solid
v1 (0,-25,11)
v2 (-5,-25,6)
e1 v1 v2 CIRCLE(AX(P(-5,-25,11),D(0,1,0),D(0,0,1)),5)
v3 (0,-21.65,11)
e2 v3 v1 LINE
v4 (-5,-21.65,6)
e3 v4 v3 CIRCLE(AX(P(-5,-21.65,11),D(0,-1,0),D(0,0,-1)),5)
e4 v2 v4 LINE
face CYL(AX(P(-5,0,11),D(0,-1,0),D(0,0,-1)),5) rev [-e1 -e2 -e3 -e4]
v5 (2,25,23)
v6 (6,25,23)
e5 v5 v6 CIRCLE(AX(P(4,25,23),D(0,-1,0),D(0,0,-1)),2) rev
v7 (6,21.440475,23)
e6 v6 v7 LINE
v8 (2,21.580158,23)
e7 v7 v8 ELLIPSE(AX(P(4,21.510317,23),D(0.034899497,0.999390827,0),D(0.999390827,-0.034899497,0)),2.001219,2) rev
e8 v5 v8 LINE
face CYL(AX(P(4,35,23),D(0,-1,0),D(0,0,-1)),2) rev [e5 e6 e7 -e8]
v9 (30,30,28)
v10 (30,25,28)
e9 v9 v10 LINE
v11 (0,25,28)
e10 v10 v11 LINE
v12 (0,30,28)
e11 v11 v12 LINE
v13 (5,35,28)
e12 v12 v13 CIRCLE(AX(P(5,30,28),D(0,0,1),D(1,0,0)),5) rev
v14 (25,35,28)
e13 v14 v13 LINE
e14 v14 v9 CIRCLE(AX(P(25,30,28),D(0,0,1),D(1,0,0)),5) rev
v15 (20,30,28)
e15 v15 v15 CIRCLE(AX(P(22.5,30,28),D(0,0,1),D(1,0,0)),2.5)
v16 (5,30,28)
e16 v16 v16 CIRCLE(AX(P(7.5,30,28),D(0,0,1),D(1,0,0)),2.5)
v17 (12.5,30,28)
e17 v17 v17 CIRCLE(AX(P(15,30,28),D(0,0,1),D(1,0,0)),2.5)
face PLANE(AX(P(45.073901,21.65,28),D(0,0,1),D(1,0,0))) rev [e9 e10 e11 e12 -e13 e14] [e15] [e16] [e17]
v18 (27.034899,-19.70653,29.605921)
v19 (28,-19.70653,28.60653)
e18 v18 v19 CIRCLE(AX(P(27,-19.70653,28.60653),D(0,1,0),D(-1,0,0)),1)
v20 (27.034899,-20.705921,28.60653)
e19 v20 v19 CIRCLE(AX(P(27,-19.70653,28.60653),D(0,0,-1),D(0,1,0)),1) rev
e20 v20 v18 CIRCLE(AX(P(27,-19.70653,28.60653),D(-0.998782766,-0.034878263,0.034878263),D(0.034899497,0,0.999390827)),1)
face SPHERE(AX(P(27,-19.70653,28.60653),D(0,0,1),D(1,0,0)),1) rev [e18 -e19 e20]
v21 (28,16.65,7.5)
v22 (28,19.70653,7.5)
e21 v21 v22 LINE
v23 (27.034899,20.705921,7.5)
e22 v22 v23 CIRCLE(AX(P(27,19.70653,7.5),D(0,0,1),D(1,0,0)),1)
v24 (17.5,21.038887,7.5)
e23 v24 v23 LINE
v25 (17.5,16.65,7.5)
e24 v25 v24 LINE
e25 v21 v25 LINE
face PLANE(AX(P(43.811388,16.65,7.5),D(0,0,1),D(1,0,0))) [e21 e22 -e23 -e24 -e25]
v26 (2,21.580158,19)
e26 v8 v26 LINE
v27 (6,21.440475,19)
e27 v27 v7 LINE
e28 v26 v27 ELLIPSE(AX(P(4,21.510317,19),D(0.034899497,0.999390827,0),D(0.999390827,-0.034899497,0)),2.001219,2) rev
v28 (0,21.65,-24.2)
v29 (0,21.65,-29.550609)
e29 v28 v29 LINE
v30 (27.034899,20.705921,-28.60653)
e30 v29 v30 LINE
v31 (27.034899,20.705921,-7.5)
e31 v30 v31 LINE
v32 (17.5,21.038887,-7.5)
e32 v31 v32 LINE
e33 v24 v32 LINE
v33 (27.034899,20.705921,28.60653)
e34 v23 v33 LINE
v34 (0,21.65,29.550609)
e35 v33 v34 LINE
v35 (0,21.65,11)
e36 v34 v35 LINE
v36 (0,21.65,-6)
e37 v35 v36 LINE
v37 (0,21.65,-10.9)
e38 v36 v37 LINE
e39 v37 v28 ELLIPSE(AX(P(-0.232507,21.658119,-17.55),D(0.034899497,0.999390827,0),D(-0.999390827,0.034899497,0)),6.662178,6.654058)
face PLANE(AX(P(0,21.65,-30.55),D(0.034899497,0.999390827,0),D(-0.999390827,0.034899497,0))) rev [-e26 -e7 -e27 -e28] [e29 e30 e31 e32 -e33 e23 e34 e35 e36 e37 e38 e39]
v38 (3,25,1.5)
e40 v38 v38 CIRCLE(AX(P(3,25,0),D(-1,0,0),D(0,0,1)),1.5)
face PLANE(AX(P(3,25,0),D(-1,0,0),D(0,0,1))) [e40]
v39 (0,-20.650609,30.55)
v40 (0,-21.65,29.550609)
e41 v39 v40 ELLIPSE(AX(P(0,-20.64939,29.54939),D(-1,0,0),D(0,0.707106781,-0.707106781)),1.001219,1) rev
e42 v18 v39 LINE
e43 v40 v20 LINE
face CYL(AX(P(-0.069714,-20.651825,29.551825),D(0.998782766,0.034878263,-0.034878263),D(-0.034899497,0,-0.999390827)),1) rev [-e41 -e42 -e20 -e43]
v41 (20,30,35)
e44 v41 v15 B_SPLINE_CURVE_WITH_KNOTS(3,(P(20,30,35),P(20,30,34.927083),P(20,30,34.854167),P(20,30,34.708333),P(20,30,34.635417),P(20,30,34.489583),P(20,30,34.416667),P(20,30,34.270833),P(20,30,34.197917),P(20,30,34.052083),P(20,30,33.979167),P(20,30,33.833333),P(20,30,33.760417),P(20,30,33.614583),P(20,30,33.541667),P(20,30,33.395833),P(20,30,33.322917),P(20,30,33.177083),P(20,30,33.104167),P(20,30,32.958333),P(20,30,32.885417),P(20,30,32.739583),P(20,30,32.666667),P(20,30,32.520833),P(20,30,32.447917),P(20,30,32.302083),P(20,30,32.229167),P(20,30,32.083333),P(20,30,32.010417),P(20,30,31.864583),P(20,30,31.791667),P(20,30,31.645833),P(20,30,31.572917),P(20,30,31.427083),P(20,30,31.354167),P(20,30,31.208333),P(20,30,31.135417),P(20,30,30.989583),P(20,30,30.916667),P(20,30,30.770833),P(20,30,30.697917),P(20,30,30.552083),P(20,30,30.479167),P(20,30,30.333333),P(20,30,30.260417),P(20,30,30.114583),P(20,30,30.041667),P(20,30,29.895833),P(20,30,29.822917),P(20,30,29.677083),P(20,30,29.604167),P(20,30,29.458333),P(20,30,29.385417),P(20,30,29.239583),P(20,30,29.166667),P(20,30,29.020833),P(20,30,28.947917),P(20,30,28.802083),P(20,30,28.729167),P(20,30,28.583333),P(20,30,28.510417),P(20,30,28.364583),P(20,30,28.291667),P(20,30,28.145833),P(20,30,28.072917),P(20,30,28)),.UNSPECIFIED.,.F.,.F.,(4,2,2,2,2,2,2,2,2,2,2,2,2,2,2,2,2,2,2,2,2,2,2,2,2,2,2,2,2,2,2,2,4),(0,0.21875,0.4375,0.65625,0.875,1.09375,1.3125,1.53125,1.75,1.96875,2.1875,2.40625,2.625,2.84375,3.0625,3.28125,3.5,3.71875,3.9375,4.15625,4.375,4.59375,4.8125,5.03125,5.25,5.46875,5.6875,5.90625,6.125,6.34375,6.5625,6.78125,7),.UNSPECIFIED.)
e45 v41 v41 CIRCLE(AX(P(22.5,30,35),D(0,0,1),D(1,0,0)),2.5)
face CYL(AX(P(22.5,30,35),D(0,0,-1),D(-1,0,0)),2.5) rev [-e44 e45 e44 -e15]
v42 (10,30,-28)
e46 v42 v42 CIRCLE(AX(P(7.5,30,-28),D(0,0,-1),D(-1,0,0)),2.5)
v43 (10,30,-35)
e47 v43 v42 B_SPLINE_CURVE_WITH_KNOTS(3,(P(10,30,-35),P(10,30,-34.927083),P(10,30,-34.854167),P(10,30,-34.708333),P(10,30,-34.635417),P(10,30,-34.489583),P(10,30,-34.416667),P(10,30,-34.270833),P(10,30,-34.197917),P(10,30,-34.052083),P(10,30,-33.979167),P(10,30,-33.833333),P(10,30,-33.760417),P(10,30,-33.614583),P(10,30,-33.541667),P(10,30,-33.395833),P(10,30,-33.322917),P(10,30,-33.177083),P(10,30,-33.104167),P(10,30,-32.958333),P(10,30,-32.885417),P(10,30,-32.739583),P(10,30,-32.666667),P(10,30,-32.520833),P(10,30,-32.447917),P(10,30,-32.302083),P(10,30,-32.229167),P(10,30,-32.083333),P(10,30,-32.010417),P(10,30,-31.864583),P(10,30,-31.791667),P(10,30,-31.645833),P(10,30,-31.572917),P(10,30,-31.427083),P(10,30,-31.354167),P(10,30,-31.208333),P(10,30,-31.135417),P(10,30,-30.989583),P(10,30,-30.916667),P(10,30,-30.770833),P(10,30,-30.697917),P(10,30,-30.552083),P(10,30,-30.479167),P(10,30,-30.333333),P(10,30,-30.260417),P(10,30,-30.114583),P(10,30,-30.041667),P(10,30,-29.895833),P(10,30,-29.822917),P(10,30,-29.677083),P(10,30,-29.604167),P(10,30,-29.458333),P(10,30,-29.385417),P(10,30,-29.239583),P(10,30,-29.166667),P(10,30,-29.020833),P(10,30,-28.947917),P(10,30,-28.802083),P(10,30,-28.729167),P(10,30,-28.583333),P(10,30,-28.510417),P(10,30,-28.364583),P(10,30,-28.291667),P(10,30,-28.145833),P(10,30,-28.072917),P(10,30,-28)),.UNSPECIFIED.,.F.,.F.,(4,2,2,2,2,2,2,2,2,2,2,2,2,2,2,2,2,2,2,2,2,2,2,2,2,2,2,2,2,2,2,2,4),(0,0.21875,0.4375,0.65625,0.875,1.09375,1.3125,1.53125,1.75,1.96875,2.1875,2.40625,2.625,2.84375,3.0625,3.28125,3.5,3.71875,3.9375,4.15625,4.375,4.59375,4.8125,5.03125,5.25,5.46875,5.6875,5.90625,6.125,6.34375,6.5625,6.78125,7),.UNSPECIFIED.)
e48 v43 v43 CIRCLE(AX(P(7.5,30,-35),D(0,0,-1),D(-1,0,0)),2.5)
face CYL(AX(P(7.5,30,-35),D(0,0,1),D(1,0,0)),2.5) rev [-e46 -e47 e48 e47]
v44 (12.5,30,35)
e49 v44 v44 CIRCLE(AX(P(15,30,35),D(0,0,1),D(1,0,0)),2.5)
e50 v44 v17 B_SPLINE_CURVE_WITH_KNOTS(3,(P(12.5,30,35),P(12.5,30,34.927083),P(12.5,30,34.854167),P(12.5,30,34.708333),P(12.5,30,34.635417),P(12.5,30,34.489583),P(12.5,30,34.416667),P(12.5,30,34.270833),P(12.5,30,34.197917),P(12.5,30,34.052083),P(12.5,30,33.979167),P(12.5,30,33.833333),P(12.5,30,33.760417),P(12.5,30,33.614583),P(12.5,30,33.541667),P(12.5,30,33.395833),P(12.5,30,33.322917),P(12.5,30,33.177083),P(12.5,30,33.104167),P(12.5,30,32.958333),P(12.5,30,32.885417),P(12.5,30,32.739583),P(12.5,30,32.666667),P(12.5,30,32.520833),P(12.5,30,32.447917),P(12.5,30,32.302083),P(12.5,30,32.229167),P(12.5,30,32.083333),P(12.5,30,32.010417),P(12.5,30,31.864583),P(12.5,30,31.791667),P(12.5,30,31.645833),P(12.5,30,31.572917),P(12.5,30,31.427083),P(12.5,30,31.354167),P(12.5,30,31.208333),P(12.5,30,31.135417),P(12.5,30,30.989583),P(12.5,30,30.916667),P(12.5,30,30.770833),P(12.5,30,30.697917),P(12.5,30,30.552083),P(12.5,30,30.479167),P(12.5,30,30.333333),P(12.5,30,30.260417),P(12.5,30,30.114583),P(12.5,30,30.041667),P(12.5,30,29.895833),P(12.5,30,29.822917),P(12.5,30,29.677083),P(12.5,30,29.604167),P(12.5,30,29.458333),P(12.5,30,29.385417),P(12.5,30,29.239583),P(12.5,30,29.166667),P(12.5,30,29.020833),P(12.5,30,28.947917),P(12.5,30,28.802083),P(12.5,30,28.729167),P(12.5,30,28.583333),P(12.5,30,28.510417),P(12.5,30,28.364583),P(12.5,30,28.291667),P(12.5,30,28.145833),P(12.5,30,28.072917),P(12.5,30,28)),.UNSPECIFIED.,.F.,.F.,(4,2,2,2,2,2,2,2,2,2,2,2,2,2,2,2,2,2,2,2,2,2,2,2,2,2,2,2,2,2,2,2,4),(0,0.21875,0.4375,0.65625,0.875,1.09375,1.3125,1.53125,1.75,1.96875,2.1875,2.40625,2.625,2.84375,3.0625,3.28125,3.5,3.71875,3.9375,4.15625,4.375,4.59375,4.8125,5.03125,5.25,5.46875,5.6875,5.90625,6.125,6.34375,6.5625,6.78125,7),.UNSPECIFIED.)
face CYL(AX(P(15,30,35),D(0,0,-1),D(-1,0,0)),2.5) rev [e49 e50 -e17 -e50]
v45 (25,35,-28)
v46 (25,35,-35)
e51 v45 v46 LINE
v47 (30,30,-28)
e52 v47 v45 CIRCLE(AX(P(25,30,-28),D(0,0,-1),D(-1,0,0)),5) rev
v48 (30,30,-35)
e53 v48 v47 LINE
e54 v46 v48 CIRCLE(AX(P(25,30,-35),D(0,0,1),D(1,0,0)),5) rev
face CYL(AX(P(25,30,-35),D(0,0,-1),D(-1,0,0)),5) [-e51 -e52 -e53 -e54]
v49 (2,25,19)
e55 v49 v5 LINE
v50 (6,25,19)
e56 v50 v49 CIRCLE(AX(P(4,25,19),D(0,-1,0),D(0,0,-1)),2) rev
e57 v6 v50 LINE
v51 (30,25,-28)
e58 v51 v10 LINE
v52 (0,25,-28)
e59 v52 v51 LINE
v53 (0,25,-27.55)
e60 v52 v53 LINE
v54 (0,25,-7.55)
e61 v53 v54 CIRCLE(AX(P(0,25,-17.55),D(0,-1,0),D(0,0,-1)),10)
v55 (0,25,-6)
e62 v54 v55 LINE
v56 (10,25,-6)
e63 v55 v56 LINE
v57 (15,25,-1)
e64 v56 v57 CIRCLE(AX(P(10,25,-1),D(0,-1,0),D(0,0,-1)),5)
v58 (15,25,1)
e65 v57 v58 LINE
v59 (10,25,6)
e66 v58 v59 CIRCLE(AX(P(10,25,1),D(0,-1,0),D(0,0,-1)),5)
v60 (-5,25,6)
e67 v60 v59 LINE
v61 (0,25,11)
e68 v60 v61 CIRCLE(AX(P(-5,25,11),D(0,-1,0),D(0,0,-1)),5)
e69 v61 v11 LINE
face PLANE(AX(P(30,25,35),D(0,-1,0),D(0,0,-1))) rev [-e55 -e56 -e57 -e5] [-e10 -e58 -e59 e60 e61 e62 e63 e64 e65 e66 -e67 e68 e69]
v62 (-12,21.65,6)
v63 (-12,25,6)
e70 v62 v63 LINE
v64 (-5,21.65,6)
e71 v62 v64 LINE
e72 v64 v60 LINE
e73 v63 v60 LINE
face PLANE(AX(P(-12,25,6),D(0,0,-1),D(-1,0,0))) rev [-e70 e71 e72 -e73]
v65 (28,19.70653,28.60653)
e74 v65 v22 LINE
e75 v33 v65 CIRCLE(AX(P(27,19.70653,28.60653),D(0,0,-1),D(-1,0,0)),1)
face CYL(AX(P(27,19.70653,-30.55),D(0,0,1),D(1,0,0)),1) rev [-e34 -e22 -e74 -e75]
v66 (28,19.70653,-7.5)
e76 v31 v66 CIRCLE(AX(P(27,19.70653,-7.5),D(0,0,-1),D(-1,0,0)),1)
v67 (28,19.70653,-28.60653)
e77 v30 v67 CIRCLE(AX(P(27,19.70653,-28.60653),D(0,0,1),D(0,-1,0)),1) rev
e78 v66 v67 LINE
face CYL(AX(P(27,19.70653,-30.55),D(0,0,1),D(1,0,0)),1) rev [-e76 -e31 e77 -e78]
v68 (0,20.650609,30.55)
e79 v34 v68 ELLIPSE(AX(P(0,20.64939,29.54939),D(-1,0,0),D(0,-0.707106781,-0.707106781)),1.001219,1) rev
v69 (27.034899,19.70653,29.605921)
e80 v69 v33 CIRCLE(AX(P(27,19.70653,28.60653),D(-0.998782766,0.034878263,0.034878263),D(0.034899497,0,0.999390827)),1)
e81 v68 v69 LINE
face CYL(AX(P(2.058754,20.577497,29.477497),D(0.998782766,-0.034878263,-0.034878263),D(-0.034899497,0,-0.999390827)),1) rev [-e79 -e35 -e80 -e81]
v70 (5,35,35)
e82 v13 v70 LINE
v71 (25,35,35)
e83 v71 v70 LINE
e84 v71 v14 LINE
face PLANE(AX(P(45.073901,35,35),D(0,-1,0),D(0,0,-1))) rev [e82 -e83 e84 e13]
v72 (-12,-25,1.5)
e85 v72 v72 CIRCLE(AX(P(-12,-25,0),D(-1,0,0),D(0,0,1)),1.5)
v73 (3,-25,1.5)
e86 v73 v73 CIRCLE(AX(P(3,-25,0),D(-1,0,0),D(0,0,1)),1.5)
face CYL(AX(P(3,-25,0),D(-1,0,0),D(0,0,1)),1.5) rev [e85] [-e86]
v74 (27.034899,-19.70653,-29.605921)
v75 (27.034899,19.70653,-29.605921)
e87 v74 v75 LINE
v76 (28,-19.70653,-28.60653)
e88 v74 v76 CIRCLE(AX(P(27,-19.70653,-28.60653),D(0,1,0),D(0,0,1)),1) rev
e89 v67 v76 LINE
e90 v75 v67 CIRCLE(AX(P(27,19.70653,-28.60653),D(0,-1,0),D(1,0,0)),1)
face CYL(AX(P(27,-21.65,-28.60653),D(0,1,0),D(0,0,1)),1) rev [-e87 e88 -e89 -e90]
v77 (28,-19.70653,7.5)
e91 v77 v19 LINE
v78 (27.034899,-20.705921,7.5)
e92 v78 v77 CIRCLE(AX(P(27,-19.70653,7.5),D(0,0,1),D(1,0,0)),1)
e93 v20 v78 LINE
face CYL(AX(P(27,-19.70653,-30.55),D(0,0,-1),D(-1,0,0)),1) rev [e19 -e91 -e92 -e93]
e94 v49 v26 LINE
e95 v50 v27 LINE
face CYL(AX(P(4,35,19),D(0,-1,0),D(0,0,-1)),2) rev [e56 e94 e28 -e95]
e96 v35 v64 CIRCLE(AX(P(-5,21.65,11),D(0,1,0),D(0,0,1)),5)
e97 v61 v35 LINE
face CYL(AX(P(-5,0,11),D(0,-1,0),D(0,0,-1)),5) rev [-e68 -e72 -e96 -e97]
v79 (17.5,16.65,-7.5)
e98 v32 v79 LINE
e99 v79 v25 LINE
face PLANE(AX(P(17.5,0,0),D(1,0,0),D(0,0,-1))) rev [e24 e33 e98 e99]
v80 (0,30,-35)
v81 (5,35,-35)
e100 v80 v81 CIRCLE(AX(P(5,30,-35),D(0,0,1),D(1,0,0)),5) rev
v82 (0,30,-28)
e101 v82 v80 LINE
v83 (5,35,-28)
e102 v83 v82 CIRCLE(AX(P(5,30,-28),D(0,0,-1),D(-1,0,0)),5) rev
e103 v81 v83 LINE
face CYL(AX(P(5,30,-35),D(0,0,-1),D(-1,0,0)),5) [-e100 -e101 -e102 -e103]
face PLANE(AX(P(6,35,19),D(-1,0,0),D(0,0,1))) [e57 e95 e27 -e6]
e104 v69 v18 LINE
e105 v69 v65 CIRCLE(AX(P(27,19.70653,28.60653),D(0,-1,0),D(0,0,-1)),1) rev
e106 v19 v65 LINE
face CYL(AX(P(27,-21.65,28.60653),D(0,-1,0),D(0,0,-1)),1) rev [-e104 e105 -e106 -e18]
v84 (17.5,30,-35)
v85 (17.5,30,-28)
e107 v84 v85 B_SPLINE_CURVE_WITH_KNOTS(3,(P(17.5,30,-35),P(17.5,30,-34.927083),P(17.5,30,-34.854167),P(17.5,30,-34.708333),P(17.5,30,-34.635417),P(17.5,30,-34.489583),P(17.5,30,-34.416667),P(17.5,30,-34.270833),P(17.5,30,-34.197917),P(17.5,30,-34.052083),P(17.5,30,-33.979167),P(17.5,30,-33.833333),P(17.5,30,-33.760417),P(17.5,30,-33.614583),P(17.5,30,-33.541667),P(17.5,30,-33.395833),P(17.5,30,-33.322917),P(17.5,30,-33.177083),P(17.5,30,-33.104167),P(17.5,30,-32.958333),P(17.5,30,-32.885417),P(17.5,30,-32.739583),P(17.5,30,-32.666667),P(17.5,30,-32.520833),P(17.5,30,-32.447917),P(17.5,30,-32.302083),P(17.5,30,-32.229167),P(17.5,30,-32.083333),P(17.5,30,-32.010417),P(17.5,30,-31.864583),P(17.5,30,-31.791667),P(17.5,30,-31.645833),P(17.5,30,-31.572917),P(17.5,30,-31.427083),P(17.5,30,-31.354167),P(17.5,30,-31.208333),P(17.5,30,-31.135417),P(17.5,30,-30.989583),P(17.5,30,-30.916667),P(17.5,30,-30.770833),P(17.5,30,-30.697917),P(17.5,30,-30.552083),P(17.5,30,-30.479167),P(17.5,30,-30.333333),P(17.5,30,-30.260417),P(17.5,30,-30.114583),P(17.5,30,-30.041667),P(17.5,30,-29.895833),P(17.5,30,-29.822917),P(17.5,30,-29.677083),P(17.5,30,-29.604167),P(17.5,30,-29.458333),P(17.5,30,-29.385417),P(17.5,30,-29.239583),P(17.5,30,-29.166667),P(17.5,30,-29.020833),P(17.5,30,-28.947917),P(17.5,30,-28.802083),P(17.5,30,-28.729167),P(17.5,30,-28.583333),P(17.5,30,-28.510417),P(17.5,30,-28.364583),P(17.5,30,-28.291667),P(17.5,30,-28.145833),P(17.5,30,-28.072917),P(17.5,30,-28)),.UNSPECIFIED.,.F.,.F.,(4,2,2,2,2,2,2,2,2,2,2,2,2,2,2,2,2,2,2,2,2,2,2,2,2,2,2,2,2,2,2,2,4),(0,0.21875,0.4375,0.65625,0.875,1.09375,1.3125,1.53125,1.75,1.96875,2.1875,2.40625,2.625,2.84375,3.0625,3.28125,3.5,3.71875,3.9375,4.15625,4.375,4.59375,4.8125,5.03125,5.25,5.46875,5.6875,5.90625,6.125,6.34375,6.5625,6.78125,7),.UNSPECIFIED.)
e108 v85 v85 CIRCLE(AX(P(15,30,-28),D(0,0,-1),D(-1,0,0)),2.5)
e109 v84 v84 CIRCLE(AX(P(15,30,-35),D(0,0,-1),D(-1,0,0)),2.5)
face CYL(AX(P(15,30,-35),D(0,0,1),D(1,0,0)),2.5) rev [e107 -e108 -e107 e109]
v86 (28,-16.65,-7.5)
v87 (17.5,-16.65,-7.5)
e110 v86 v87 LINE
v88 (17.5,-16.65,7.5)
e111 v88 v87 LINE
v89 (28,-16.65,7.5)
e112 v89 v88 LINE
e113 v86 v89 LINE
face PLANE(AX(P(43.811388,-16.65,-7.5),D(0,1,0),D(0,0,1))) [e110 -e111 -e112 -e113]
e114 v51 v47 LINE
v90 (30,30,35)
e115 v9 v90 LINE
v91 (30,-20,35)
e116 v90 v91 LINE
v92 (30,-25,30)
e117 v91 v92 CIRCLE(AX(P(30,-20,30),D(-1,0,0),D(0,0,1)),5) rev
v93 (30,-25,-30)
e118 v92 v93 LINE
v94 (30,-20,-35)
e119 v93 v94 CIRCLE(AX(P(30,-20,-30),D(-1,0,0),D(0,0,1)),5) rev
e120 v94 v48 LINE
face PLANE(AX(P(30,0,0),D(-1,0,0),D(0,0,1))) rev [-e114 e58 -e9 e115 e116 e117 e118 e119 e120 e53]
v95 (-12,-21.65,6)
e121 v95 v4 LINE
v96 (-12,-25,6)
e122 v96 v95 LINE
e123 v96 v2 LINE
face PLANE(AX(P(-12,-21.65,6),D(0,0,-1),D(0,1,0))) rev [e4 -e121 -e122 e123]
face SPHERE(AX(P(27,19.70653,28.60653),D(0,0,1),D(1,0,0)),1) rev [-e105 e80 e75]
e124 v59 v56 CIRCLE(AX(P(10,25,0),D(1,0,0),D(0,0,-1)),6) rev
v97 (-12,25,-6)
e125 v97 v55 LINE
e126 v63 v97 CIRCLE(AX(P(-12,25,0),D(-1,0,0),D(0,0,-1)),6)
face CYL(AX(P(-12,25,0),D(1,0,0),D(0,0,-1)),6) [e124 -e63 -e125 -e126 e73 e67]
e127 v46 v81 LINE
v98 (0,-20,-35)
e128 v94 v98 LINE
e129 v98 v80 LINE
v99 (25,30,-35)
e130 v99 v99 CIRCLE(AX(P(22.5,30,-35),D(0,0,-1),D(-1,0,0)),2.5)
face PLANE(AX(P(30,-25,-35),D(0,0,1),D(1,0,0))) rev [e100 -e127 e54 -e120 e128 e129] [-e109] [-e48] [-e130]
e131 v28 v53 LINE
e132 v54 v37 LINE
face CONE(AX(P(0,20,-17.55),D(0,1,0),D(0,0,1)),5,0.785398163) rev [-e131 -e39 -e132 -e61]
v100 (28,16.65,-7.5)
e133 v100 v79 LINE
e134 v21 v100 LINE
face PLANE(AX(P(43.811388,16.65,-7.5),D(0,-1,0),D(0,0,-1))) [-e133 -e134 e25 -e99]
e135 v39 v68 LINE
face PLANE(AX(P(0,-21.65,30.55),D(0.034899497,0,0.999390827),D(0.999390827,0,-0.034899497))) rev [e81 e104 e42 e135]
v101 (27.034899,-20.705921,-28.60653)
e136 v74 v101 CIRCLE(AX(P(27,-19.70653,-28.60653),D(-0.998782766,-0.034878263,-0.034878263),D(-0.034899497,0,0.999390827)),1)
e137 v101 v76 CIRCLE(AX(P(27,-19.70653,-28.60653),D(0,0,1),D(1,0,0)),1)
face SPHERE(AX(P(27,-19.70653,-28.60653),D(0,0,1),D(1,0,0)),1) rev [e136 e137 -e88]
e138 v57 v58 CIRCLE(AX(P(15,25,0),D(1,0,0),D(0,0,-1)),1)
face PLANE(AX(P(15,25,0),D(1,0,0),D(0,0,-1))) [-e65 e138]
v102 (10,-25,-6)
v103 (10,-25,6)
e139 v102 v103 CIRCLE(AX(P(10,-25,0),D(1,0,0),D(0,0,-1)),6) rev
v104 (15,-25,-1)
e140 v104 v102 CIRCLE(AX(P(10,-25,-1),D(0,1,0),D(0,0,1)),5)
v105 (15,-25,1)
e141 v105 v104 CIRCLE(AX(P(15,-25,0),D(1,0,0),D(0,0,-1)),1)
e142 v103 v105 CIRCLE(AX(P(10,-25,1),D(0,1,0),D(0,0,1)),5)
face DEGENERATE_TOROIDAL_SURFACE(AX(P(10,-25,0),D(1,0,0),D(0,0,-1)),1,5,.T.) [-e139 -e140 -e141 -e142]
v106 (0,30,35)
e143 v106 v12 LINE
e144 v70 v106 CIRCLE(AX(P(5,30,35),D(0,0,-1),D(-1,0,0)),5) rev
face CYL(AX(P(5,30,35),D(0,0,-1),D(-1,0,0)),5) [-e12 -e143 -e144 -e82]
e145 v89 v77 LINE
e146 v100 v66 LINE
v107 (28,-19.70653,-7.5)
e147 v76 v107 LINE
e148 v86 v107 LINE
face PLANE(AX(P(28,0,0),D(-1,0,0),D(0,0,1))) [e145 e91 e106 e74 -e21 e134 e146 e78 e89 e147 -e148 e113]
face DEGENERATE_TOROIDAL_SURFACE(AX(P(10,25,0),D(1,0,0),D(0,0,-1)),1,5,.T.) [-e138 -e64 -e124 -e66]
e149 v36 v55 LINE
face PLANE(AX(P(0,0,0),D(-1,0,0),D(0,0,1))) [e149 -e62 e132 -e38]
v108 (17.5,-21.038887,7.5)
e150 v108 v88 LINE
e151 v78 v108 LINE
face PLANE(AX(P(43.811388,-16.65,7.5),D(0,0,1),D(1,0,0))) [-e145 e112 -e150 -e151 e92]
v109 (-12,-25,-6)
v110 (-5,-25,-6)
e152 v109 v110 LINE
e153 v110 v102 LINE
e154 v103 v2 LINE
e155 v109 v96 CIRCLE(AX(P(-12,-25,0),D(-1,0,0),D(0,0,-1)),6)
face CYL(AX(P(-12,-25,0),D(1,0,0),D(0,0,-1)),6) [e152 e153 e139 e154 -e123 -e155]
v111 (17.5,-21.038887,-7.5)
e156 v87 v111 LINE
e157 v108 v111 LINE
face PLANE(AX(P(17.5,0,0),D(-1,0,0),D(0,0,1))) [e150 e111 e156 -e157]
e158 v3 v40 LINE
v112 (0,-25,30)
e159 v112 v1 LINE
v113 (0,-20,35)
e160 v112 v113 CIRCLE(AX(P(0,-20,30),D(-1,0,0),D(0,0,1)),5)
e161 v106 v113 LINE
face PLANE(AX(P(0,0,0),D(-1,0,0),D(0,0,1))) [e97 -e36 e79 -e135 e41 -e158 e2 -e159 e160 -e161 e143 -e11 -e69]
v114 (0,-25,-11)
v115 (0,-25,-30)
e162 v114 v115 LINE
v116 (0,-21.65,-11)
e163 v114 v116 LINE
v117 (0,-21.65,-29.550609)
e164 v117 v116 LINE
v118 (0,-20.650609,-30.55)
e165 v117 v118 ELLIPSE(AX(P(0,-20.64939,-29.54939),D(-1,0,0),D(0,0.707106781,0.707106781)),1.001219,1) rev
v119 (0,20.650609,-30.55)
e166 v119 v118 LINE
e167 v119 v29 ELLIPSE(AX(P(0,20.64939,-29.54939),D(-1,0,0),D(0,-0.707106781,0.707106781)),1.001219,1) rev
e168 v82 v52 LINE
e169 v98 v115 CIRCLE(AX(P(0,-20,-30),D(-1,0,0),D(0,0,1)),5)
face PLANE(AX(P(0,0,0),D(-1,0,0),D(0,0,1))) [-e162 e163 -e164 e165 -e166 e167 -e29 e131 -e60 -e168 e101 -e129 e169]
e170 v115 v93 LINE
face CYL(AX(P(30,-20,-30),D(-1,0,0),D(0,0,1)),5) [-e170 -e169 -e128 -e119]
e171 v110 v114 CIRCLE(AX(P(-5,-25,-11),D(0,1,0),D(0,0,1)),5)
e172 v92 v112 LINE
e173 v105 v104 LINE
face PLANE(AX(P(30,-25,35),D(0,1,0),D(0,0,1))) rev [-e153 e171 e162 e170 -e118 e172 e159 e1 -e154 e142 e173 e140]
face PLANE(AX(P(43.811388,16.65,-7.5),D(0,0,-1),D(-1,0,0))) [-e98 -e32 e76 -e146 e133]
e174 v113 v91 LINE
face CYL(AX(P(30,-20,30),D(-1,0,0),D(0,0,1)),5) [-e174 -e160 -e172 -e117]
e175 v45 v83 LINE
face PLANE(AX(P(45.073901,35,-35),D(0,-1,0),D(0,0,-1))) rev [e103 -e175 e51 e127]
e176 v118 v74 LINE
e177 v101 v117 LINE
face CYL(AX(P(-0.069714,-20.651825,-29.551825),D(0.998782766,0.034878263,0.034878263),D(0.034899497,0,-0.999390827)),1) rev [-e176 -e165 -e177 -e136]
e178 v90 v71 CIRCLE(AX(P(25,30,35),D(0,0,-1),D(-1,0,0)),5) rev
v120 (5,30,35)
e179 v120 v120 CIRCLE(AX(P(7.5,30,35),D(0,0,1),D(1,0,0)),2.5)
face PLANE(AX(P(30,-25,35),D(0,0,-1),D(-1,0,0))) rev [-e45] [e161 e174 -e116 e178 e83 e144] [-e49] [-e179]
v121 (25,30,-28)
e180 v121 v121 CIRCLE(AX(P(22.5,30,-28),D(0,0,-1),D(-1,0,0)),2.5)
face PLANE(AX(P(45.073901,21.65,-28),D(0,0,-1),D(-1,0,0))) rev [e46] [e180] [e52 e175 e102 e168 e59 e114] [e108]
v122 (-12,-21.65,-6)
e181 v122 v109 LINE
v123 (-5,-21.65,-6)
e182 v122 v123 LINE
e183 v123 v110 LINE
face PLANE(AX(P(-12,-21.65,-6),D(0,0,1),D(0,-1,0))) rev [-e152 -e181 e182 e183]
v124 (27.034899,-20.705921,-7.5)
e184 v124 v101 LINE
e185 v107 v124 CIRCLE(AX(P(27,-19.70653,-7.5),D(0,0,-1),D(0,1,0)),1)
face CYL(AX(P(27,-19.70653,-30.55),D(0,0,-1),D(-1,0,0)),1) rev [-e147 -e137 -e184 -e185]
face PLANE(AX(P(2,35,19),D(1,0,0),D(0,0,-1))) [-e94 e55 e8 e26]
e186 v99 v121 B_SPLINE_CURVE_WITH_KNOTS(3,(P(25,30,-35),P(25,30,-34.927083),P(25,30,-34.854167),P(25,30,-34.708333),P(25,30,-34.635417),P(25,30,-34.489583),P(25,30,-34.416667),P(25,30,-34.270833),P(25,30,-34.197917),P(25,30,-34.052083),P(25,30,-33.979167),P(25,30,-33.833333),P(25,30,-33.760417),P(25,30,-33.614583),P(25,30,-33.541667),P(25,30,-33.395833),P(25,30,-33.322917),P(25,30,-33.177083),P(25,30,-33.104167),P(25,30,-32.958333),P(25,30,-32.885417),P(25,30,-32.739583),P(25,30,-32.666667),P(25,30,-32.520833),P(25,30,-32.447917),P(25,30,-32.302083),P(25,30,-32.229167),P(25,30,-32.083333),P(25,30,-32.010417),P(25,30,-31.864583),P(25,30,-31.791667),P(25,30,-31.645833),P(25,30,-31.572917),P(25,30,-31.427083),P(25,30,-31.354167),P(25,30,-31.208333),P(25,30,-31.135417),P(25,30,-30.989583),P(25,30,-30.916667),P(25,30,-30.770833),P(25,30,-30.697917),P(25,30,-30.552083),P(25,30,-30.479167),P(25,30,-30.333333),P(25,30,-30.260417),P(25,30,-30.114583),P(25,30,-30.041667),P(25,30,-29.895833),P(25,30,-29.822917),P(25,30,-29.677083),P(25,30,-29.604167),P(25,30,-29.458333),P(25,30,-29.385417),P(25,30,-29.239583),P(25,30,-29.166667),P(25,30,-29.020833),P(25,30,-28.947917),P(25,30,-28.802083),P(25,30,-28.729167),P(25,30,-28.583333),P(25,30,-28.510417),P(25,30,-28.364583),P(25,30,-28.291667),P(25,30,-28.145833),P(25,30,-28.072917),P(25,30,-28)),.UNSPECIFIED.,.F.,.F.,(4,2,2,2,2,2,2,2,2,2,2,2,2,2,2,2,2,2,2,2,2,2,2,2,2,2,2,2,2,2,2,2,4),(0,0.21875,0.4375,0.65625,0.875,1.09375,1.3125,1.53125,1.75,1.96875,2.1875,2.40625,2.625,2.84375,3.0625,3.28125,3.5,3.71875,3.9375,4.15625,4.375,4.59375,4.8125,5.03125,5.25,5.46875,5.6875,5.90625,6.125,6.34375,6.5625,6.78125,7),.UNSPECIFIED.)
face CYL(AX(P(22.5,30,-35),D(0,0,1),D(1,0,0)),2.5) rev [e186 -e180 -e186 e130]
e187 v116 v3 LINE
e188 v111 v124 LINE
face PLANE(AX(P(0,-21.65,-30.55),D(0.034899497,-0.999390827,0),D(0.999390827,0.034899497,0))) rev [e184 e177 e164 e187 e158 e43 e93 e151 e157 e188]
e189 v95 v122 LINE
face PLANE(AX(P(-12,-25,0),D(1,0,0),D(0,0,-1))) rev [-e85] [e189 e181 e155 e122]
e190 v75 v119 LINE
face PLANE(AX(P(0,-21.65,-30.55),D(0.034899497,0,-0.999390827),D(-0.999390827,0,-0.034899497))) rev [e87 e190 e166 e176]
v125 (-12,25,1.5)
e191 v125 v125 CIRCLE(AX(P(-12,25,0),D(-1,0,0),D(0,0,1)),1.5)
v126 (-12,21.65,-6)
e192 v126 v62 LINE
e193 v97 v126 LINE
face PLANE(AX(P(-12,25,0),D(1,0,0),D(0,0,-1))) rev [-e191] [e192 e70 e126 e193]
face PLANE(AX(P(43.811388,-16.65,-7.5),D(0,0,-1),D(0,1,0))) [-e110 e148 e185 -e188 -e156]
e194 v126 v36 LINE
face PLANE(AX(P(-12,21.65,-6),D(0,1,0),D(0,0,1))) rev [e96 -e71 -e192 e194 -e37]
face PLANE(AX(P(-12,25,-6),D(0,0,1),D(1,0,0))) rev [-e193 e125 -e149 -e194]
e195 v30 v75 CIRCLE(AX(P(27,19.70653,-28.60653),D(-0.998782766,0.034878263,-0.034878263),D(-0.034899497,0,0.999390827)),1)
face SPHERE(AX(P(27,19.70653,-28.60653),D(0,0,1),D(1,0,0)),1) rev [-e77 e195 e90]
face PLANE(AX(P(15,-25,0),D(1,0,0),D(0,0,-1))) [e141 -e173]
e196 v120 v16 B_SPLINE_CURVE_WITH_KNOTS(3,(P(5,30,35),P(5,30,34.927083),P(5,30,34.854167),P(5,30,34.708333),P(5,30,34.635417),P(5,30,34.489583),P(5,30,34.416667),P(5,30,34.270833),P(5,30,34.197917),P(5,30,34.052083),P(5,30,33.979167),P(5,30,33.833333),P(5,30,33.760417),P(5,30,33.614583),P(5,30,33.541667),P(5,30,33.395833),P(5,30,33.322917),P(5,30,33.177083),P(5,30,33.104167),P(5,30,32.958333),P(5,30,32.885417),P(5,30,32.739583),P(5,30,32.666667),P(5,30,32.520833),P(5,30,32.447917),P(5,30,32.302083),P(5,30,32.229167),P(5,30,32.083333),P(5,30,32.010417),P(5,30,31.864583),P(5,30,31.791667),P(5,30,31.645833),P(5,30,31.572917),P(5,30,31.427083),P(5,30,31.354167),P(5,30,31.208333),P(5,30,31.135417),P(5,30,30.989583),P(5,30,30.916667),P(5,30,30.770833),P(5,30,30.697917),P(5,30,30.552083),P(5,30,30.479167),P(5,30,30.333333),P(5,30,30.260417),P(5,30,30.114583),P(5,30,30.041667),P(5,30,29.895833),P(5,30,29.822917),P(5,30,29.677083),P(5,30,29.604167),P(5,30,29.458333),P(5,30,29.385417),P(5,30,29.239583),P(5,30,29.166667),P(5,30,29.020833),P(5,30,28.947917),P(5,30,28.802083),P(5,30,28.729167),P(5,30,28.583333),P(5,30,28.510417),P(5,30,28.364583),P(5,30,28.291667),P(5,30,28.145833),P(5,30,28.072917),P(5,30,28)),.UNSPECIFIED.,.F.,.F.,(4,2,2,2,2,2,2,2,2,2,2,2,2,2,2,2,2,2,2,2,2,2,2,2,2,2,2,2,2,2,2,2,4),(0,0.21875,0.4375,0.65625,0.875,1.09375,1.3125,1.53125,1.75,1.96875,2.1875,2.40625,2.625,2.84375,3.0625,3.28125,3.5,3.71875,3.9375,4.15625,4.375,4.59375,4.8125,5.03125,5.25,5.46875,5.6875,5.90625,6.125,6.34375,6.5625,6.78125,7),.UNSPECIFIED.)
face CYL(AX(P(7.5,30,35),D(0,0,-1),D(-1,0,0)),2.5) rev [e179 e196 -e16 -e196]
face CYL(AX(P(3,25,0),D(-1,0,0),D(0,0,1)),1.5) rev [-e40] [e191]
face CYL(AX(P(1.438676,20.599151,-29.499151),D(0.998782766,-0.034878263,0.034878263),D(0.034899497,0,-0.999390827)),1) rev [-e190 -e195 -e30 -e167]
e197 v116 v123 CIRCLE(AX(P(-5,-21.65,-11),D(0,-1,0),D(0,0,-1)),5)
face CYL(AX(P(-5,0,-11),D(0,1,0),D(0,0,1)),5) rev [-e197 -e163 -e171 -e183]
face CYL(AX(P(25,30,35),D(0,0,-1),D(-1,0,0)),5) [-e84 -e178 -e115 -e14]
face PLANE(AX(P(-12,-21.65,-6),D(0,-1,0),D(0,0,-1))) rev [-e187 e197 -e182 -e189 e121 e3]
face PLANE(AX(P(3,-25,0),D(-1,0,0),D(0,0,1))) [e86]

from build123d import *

# Parameters (mm, degrees)
SKETCH1_W                = 70
SKETCH1_H                = 50
BOSS_EXTRUDE1_DEPTH      = 30
SKETCH2_W                = 61.1
SKETCH2_H                = 43.3
CUT_EXTRUDE1_DEPTH       = 28
CUT_EXTRUDE1_DRAFT       = -2
SKETCH3_W                = 7
SKETCH3_H                = 13.35
HANG_TABS_DEPTH          = 30
BOSS_EXTRUDE3_DEPTH      = 12
BOSS_EXTRUDE3_DEPTH_BACK = 15
SKETCH5_R                = 1.5
CUT_EXTRUDE2_DEPTH       = 15
SKETCH6_R                = 5
CUT_EXTRUDE3_DEPTH       = 58.879184514
CUT_EXTRUDE4_DEPTH       = 58.879184514
CUT_EXTRUDE5_START       = -28
SKETCH8_R                = 2.5
CUT_EXTRUDE5_DEPTH       = 30.879184514
CUT_EXTRUDE6_START       = 28
SKETCH8_2_R              = 2.5
CUT_EXTRUDE6_DEPTH       = 30.879184514
FILLET2_R                = 5
FILLET3_R                = 5
CHAMFER1_SIZE            = 5
FILLET4_R                = 5
BOSS_EXTRUDE4_START      = -17.5
SKETCH9_W                = 15
SKETCH9_H                = 5
BOSS_EXTRUDE4_DEPTH      = 10.5
FILLET5_R                = 5
FILLET6_R                = 1


with BuildPart() as part:
    # Sketch1 → Boss-Extrude1 (new body)
    with BuildSketch(Plane(origin=(0, 0, 0), x_dir=(0, 0, -1), z_dir=(1, 0, 0))):
        Rectangle(SKETCH1_W, SKETCH1_H)
    extrude(amount=BOSS_EXTRUDE1_DEPTH)


with BuildPart() as cut_extrude1_tool:
    # Sketch2 → Cut-Extrude1 (with draft: the straight prism first)
    with BuildSketch(Plane.ZY):
        Rectangle(SKETCH2_W, SKETCH2_H)
    extrude(amount=-CUT_EXTRUDE1_DEPTH)
    # Cut-Extrude1: the draft: its side faces are tilted about the plane it starts from
    cut_extrude1_sides = [cut_extrude1_tool.faces().sort_by_distance(p)[0] for p in [
        (14, -21.65, 0),
        (14, 0, 30.55),
        (14, 21.65, 0),
        (14, 0, -30.55),
    ]]
    draft(cut_extrude1_sides, Plane.ZY, CUT_EXTRUDE1_DRAFT)


with BuildPart() as part_1:
    add(part.part)

    # Cut-Extrude1: cut by cut_extrude1_tool
    add(cut_extrude1_tool.part, mode=Mode.SUBTRACT)

    # Sketch3 → Hang tabs (add)
    with BuildSketch(Plane(origin=(0, 0, 0), x_dir=(0, 0, -1), z_dir=(1, 0, 0))):
        with Locations((-31.5, 28.325)):
            Rectangle(SKETCH3_W, SKETCH3_H)
        with Locations((31.5, 28.325)):
            Rectangle(SKETCH3_W, SKETCH3_H)
    extrude(amount=HANG_TABS_DEPTH)

    # Sketch4 → Boss-Extrude3 (add, two sides: drawn at the far end of the back side and taken through both)
    with BuildSketch(Plane.ZY.offset(-BOSS_EXTRUDE3_DEPTH_BACK)):
        with BuildLine():
            Line((-6, 25), (-6, 21.65))
            Line((-6, 21.65), (6, 21.65))
            Line((6, 21.65), (6, 25))
            ThreePointArc((6, 25), (0, 31), (-6, 25))
        make_face()
        with BuildLine():
            Line((-6, -21.65), (6, -21.65))
            Line((6, -21.65), (6, -25))
            ThreePointArc((6, -25), (0, -31), (-6, -25))
            Line((-6, -25), (-6, -21.65))
        make_face()
    extrude(amount=BOSS_EXTRUDE3_DEPTH + BOSS_EXTRUDE3_DEPTH_BACK)

    # Sketch5 → Cut-Extrude2 (cut)
    with BuildSketch(Plane.ZY.offset(12)):
        with Locations((0, 25)):
            Circle(SKETCH5_R)
        with Locations((0, -25)):
            Circle(SKETCH5_R)
    extrude(amount=-CUT_EXTRUDE2_DEPTH, mode=Mode.SUBTRACT)

    # Sketch6 → Cut-Extrude3 (cut, through all)
    with BuildSketch(Plane(origin=(0, 0, 0), x_dir=(1, 0, 0), z_dir=(0, 1, 0))):
        with Locations((0, 17.55)):
            Circle(SKETCH6_R)
    extrude(amount=CUT_EXTRUDE3_DEPTH, mode=Mode.SUBTRACT)

    # Sketch7 → Cut-Extrude4 (cut, through all)
    with BuildSketch(Plane(origin=(0, 0, 0), x_dir=(1, 0, 0), z_dir=(0, 1, 0))):
        with BuildLine():
            Line((6, -19), (6, -23))
            ThreePointArc((6, -23), (4, -25), (2, -23))
            Line((2, -23), (2, -19))
            ThreePointArc((2, -19), (4, -17), (6, -19))
        make_face()
    extrude(amount=CUT_EXTRUDE4_DEPTH, mode=Mode.SUBTRACT)

    # Sketch8 → Cut-Extrude5 (cut, through all)
    with BuildSketch(Plane.XY.offset(CUT_EXTRUDE5_START)):
        with Locations((15, 30)):
            Circle(SKETCH8_R)
        with Locations((22.5, 30)):
            Circle(SKETCH8_R)
        with Locations((7.5, 30)):
            Circle(SKETCH8_R)
    extrude(amount=-CUT_EXTRUDE5_DEPTH, mode=Mode.SUBTRACT)

    # Sketch8<2> → Cut-Extrude6 (cut, through all)
    with BuildSketch(Plane.XY.offset(CUT_EXTRUDE6_START)):
        with Locations((15, 30)):
            Circle(SKETCH8_2_R)
        with Locations((22.5, 30)):
            Circle(SKETCH8_2_R)
        with Locations((7.5, 30)):
            Circle(SKETCH8_2_R)
    extrude(amount=CUT_EXTRUDE6_DEPTH, mode=Mode.SUBTRACT)

    # Fillet2
    fillet2_edges = [part_1.edges().sort_by_distance(p)[0] for p in [
        (30, 35, 31.5),
        (0, 35, 31.5),
        (30, 35, -31.5),
        (0, 35, -31.5),
    ]]
    fillet(fillet2_edges, radius=FILLET2_R)

    # Fillet3
    fillet3_edges = [part_1.edges().sort_by_distance(p)[0] for p in [
        (15, 31, 0),
        (15, -31, 0),
    ]]
    fillet(fillet3_edges, radius=FILLET3_R)

    # Chamfer1
    # the kernel refuses this chamfer: 5 mm, written as the material it takes off along each edge
    with BuildSketch(Plane(origin=(0, 25, -17.55), x_dir=(-0.9999950652018581, 0, -0.003141587485879425), z_dir=(-0.003141587485879425, 0, 0.9999950652018581))) as chamfer1_piece_1:
        Polygon((5 + CHAMFER1_SIZE, 0), (5, CHAMFER1_SIZE), (5, 0), align=None)
    revolve(axis=Axis((0, 25, -17.55), (0, -1, 0)), revolution_arc=359.64, mode=Mode.SUBTRACT)

    # Fillet4
    fillet4_edges = [part_1.edges().sort_by_distance(p)[0] for p in [
        (15, -25, -35),
        (15, -25, 35),
    ]]
    fillet(fillet4_edges, radius=FILLET4_R)

    # Sketch9 → Boss-Extrude4 (add)
    with BuildSketch(Plane.ZY.offset(BOSS_EXTRUDE4_START)):
        with Locations((0, 19.15)):
            Rectangle(SKETCH9_W, SKETCH9_H)
        with Locations((0, -19.15)):
            Rectangle(SKETCH9_W, SKETCH9_H)
    extrude(amount=-BOSS_EXTRUDE4_DEPTH)

    # Fillet5
    fillet5_edges = [part_1.edges().sort_by_distance(p)[0] for p in [
        (0, 23.325, 6),
        (0, -23.325, 6),
        (0, -23.325, -6),
    ]]
    fillet(fillet5_edges, radius=FILLET5_R)

    # Fillet6
    fillet6_edges = [part_1.edges().sort_by_distance(p)[0] for p in [
        (14, 21.161109227, 30.061109227),
        (14, -21.161109227, 30.061109227),
        (14, -21.161109227, -30.061109227),
        (14, 21.161109227, -30.061109227),
        (28, 0, 29.572218454),
        (28, -20.672218454, 18.536109227),
        (28, 0, -29.572218454),
        (28, 20.672218454, -18.536109227),
        (28, 20.672218454, 18.536109227),
        (28, -20.672218454, -18.536109227),
    ]]
    fillet(fillet6_edges, radius=FILLET6_R)


solid = part_1.part
